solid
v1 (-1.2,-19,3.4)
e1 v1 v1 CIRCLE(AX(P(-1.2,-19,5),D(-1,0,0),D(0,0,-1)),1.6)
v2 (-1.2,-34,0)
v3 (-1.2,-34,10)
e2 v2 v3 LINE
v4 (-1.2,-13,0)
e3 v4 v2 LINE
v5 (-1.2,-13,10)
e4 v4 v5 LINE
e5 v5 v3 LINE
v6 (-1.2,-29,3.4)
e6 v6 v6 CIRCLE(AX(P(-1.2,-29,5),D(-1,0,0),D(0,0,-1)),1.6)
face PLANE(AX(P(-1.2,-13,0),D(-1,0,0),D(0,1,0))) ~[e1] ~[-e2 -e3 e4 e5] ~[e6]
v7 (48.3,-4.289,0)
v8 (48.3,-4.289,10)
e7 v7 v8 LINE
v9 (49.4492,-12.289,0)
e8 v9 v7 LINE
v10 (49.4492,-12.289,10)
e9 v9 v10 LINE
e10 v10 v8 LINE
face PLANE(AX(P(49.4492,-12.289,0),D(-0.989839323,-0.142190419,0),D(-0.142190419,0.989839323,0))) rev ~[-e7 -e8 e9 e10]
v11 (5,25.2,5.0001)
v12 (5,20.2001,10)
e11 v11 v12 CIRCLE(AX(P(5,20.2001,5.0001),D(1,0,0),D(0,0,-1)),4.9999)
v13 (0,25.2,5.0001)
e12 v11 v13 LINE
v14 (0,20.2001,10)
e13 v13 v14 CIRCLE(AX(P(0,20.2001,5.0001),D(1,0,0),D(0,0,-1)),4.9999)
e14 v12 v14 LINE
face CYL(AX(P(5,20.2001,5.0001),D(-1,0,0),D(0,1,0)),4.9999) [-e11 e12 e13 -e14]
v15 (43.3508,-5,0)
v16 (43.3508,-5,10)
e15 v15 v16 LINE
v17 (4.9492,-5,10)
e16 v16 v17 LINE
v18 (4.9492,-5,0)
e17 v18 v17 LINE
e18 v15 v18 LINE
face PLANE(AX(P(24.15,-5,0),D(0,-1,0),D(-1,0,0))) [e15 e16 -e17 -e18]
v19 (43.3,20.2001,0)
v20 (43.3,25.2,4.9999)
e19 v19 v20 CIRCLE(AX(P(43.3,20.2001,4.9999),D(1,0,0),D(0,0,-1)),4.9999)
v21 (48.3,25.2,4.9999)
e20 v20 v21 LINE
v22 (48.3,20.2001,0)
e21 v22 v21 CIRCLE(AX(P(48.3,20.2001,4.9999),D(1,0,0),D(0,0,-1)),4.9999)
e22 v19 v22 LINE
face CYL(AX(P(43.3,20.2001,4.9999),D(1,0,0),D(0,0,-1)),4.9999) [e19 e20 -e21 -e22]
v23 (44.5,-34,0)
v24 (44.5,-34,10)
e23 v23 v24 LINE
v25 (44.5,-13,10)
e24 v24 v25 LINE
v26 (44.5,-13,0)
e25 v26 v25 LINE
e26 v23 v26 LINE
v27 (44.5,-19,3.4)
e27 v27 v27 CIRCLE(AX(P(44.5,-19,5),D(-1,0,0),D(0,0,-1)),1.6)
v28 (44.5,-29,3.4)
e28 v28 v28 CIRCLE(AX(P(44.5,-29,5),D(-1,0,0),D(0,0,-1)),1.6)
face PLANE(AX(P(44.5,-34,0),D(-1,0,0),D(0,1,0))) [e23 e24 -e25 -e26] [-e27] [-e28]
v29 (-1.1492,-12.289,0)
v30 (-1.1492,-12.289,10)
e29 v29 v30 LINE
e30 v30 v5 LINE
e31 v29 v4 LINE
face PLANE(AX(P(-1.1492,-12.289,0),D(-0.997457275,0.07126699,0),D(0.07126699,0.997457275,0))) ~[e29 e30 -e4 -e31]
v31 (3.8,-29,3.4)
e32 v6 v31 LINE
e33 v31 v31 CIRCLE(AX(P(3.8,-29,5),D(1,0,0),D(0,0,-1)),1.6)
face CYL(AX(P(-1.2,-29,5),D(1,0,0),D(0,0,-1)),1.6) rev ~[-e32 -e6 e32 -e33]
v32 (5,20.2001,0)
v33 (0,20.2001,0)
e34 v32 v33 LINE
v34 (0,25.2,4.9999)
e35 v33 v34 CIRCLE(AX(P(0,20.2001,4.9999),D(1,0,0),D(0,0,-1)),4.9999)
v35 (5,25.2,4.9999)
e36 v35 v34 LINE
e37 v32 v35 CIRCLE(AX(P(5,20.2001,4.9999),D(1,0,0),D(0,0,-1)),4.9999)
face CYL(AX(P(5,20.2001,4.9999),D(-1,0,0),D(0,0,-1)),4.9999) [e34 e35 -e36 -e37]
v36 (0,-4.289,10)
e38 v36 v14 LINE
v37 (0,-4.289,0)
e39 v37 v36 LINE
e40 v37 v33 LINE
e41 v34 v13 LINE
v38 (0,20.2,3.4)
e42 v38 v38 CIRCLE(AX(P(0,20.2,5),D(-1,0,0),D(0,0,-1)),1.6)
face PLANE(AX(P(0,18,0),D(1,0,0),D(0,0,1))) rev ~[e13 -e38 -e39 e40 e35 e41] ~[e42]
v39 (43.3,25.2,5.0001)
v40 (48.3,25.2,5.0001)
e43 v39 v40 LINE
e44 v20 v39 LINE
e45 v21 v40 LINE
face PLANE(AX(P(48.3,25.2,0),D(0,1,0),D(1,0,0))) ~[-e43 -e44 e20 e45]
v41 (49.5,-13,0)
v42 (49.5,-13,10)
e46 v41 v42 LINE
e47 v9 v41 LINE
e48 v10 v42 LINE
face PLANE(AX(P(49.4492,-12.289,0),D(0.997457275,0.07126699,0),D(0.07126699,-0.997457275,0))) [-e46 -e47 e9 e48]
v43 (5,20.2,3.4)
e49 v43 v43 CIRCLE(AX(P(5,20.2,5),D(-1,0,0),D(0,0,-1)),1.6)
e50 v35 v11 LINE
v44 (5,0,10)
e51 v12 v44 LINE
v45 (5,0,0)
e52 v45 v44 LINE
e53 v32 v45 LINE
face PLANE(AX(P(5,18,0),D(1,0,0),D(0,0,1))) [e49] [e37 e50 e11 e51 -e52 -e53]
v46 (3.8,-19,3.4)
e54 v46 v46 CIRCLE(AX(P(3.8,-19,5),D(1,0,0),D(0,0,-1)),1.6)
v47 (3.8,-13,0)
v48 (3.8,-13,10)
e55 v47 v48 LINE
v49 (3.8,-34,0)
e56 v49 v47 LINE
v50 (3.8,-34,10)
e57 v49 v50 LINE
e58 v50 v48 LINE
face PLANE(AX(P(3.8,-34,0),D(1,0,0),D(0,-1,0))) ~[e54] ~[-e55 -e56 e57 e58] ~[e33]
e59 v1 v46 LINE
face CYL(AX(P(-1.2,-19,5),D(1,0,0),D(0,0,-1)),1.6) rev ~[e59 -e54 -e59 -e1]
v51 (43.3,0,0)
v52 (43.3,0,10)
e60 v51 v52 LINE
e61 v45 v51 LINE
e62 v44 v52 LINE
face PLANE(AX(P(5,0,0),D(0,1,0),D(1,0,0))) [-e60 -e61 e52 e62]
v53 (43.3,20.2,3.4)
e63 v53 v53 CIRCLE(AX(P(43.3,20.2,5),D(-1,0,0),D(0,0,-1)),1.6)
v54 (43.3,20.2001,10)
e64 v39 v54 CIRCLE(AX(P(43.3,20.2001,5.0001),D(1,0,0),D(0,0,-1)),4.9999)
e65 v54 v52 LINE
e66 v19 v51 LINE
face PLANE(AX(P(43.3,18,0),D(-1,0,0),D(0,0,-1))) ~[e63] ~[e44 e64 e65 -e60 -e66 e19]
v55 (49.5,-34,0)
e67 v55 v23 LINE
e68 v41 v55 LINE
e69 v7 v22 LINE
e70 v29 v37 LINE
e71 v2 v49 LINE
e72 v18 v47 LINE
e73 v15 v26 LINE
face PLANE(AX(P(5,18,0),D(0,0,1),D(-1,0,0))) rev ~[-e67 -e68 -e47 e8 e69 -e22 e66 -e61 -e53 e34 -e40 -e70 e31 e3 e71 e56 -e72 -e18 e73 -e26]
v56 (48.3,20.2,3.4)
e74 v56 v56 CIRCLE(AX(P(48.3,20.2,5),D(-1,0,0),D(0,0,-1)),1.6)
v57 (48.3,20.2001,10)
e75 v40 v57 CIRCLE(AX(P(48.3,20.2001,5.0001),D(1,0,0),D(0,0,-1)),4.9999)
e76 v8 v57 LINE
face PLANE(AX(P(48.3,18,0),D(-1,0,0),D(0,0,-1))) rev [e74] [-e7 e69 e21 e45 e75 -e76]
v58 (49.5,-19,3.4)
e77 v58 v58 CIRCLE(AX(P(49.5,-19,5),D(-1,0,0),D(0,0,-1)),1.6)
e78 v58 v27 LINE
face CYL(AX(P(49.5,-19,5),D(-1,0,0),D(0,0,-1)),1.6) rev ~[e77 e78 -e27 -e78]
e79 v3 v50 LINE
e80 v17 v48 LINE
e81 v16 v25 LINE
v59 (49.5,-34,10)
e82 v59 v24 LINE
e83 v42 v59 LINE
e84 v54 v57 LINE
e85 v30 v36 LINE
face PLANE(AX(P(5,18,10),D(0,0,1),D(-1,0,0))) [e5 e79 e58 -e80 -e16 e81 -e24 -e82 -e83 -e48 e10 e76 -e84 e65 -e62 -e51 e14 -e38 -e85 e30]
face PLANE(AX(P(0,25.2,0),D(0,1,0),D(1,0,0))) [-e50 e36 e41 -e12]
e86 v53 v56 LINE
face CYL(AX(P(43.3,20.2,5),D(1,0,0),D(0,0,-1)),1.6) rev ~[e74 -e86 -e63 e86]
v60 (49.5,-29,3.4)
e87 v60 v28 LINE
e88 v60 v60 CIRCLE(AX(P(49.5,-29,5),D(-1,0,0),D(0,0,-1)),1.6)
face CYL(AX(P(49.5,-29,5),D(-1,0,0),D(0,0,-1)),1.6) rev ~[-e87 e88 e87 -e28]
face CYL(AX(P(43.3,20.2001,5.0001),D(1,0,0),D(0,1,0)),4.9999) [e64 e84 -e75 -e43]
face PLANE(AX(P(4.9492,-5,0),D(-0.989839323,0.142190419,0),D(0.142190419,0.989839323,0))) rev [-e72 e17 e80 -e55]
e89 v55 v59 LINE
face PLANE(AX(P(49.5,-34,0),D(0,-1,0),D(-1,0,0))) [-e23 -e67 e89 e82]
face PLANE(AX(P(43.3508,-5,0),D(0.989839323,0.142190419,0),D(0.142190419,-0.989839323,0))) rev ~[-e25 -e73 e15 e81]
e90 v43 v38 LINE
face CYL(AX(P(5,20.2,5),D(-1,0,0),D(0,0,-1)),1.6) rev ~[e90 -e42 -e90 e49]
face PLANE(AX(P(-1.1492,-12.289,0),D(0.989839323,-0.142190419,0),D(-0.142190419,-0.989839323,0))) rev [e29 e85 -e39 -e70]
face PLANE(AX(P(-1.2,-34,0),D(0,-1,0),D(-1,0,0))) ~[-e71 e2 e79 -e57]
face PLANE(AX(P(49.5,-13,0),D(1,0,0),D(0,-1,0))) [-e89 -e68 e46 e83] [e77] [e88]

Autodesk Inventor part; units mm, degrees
ref_plane "YZ Plane" through (0, 0, 0) normal (1, 0, 0) x (0, 1, 0)
ref_plane "XZ Plane" through (0, 0, 0) normal (0, 1, 0) x (-1, 0, 0)
sketch "Эскиз1" plane through (0, 0, 0) normal (0, 0, 1) x (1, 0, 0)
  line L0 (0, 0) -> (5, 0)
  line L1 (5, 0) -> (5, 18)
  line L2 (5, 18) -> (0, 18)
  line L3 (0, 18) -> (0, 0)
  line L4 (0, 0) -> (24.15, 0)
  line L5 (24.15, 0) -> (24.15, -5)
  line L6 (24.15, -5) -> (0, -5)
  line L7 (0, -5) -> (0, 0)
  dimension "d0" = 5
  dimension "d1" = 18
  dimension "d2" = 24.15
  dimension "d3" = 5
extrude "Выдавливание1" add sketch "Эскиз1" along normal blind 10
sketch "Эскиз4" plane through (0, 18, 0) normal (0, 1, 0) x (1, 0, 0)
  line L0 (0, 0) -> (0, -10) projected
  line L1 (0, 0) -> (0, -10) projected
  line L2 (5, 0) -> (0, 0) projected
  line L3 (0, 0) -> (0, -10) projected
  line L4 (5, -10) -> (0, -10) projected
  line L5 (5, 0) -> (5, -10) projected
extrude "Выдавливание2" add sketch "Эскиз4" along normal blind 7.2
fillet "Сопряжение1" radius 5 2 edges at (2.5, 25.2, 10) (2.5, 25.2, 0)
sketch "Эскиз5" plane through (5, 0, 10) normal (1, 0, 0) x (0, 0, -1)
  line L0 (0, -5) -> (0, -5) projected
  line L1 (10, -5) -> (10, -5) projected
  arc A0 (10, 20.2) -> (0, 20.2) centre (5, 20.2) ccw projected
  point P0 (10, 0)
hole "Отверстие2" at (5, 20.2, 5) direction (-1, 0, 0) diameter 3.2 depth 5
mirror "Зеркальное отражение1" about plane through (24.15, -5, 0) normal (1, 0, 0)
sketch "Эскиз9" plane through (0, 0, 0) normal (0, 0, -1) x (-1, 0, 0)
  line L0 (-48.3, 20.2) -> (-48.3, -5) projected
  line L1 (-48.3, -5) -> (-43.3, -5)
  line L2 (-43.3, -5) -> (-43.3, -4.289)
  line L3 (-43.3, -4.289) -> (-48.3, -4.289)
  line L4 (-48.3, -4.289) -> (-48.3, -5)
  line L5 (-48.3, -4.289) -> (-43.3508, -5)
  line L6 (-43.3508, -5) -> (-44.5, -13)
  line L7 (-44.5, -13) -> (-49.4492, -12.289)
  line L8 (-49.4492, -12.289) -> (-48.3, -4.289)
  line L9 (-44.5, -13) -> (-49.5, -13)
  line L10 (-49.5, -13) -> (-49.5, -34)
  line L11 (-49.5, -34) -> (-44.5, -34)
  line L12 (-44.5, -34) -> (-44.5, -13)
  line L13 (0, -5) -> (-48.3, -5) projected
  line L14 (-49.4492, -12.289) -> (-49.5, -13)
  point P0 (0, 0)
  point P1 (-43.3, -5.581)
  point P2 (-46.5, -13.5979)
  dimension "d39" = 5
  dimension "d45" = 5
  dimension "d47" = 5
  dimension "d66" = 29
  dimension "d68" = 21
  dimension "d71" = 1.2
extrude "Выдавливание4" add sketch "Эскиз9" against normal blind 10
sketch "Эскиз10" plane through (49.5, -34, 0) normal (1, 0, 0) x (0, 0, -1)
  line L0 (0, 0) -> (-10, 0) projected
  line L1 (-5, 0) -> (-5, 5)
  line L2 (-5, 5) -> (-5, 15)
  point P0 (0, 34)
  dimension "d48" = 5
  dimension "d49" = 10
hole "Отверстие5" at (49.5, -19, 5) at (49.5, -29, 5) direction (-1, 0, 0) diameter 3.2 end through all
ref_plane "РабПлоскость1" through (24.15, 20.2, 5) normal (1, 0, 0) x (0, 0, -1)
mirror "Зеркальное отражение2" about plane through (24.15, 20.2, 5) normal (1, 0, 0) of "Выдавливание4", "Отверстие5"
equation "\"d63\" = Толщина"
equation "\"Радиус_гибки\" = Толщина"
equation "\"Ширина_просечки\" = Толщина"
equation "\"Глубина_просечки\" = 0.5 * Толщина"
equation "\"Размер_просечки\" = 4 * Толщина"
equation "\"Мин_остаток\" = 2 * Толщина"
equation "\"Радиус_перехода\" = Радиус_гибки"
equation "\"Радиус_Якоби\" = Толщина"
equation "\"Размер_зазора\" = Толщина"
equation "\"Толщина\" = 0.5"
properties part number "Стойка для камеры"
